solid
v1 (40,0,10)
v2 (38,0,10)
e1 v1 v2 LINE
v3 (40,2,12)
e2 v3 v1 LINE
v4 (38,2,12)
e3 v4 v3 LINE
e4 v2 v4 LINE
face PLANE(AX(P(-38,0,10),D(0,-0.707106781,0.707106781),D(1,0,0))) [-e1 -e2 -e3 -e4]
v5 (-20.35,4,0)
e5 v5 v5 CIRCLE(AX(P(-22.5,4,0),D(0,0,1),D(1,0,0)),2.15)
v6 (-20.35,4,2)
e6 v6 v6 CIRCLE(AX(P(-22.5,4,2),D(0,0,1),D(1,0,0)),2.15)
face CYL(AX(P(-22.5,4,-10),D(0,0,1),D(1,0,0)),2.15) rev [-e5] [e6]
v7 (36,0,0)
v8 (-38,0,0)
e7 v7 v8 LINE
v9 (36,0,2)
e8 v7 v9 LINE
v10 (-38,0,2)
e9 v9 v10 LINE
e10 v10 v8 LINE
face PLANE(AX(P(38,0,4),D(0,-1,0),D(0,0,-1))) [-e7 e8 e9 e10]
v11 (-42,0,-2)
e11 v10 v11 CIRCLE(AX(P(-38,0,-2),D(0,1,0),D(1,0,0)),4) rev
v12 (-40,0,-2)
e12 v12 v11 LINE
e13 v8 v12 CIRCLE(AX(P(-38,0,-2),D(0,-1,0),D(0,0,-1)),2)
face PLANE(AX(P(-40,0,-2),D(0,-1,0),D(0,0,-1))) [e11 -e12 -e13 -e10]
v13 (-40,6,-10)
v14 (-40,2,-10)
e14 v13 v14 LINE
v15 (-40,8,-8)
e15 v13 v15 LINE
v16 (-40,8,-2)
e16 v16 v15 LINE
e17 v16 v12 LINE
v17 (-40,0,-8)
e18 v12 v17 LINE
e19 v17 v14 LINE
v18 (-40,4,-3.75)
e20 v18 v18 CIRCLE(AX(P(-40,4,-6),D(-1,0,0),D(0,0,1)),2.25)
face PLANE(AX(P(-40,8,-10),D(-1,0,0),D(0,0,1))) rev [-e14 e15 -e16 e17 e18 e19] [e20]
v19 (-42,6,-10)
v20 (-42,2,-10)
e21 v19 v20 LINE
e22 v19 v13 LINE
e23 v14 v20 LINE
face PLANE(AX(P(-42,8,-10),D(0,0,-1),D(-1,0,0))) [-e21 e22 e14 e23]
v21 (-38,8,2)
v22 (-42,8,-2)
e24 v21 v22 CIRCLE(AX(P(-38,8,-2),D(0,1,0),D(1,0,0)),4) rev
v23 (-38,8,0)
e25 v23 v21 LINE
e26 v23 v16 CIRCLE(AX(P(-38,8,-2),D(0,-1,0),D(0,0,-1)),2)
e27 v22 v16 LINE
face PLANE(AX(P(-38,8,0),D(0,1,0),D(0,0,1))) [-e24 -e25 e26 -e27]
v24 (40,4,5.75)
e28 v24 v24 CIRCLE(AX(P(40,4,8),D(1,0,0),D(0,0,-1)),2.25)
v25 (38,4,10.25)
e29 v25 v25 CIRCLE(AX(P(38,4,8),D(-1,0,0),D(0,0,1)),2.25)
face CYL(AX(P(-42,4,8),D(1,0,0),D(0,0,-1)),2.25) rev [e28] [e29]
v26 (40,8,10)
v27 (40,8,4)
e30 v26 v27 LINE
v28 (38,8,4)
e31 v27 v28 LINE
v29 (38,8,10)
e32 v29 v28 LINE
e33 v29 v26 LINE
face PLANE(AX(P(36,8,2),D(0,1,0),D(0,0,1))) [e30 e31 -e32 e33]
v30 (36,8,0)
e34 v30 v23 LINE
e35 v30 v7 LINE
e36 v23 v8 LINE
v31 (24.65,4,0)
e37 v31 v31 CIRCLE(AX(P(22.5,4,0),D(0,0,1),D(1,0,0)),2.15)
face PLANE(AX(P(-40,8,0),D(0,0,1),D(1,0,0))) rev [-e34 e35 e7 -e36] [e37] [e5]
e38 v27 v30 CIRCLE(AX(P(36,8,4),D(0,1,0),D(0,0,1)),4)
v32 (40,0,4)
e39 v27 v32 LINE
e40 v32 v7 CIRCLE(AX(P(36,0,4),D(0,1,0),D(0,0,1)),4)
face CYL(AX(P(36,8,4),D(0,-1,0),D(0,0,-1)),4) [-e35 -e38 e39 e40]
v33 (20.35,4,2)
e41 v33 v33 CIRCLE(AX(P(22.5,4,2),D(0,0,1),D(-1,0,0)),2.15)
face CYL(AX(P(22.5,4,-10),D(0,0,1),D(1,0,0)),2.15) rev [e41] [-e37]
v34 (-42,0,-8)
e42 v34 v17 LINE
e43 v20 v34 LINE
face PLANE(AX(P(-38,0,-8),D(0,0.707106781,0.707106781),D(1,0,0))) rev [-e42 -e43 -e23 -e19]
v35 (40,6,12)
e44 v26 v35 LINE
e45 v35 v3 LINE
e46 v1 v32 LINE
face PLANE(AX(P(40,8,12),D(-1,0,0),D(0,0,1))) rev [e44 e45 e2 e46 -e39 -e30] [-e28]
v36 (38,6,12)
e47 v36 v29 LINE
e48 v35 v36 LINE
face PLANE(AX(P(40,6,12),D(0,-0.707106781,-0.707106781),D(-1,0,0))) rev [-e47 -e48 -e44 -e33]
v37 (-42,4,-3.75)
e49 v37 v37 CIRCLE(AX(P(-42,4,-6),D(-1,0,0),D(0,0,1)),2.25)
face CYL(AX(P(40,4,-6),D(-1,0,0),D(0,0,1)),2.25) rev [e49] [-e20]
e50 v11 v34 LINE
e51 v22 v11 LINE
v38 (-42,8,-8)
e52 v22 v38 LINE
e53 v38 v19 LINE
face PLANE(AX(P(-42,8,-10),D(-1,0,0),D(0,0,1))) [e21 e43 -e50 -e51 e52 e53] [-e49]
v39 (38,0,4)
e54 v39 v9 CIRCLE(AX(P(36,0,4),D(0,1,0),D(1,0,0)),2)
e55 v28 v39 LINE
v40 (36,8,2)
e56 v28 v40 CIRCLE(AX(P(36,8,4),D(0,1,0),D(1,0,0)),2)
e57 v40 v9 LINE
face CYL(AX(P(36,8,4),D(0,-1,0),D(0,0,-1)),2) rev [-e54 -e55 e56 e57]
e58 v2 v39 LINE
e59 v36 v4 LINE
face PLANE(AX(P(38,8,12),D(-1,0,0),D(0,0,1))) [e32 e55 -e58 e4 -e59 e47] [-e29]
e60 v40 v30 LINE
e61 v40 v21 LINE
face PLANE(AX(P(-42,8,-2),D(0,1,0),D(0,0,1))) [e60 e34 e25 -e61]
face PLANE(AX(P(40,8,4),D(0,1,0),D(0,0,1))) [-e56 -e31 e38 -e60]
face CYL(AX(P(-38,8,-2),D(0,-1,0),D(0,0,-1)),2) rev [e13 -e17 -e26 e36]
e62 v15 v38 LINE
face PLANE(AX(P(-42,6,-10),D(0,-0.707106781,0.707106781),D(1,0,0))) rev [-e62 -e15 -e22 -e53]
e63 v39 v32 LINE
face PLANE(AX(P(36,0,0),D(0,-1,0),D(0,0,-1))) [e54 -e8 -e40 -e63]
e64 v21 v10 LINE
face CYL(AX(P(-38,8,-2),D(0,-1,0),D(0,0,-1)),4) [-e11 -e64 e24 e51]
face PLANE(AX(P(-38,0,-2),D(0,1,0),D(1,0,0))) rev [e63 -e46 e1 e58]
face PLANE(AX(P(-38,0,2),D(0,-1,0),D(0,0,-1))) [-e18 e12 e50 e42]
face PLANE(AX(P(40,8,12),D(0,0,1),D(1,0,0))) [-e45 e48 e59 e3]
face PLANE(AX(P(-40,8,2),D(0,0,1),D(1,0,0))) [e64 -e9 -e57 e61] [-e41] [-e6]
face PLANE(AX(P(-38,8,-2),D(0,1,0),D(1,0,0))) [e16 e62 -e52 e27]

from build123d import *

# Parameters (mm, degrees)
SM_BASE_FLANGE_1_DEPTH = 8
SKETCH_6_R             = 2.15
CUT_EXTRUDE_1_DEPTH    = 45.407206622
CHAMFER_1_SIZE         = 2
SKETCH_7_R             = 2.25
CUT_EXTRUDE_2_DEPTH    = 84.258633186
SKETCH_8_R             = 2.25
CUT_EXTRUDE_3_DEPTH    = 84.258633186


# Sheet-metal steps are written as plain solids
with BuildPart() as part:
    # Sketch 1 → 基体-法兰1 (new body)
    with BuildSketch(Plane(origin=(0, 0, 0), x_dir=(1, 0, 0), z_dir=(0, 1, 0))):
        with BuildLine():
            Line((-40, 10), (-40, 2))
            ThreePointArc((-40, 2), (-39.414213562, 0.585786438), (-38, 0))
            Line((-38, 0), (36, 0))
            ThreePointArc((36, 0), (38.828427125, -1.171572875), (40, -4))
            Line((40, -4), (40, -12))
            Line((40, -12), (38, -12))
            Line((38, -12), (38, -4))
            ThreePointArc((38, -4), (37.414213562, -2.585786438), (36, -2))
            Line((36, -2), (-38, -2))
            ThreePointArc((-38, -2), (-40.828427125, -0.828427125), (-42, 2))
            Line((-42, 2), (-42, 10))
            Line((-42, 10), (-40, 10))
        make_face()
    extrude(amount=SM_BASE_FLANGE_1_DEPTH)

    # 草图6 → 切除-拉伸1 (cut, through all)
    with BuildSketch(Plane.XY.offset(2)):
        with Locations((-22.5, 4)):
            Circle(SKETCH_6_R)
        with Locations((22.5, 4)):
            Circle(SKETCH_6_R)
    extrude(amount=-CUT_EXTRUDE_1_DEPTH, mode=Mode.SUBTRACT)

    # 倒角1
    chamfer_1_edges = [part.edges().sort_by_distance(p)[0] for p in [
        (39, 0, 12),
        (-41, 0, -10),
        (39, 8, 12),
        (-41, 8, -10),
    ]]
    chamfer(chamfer_1_edges, length=CHAMFER_1_SIZE)

    # 草图7 → 切除-拉伸2 (cut, through all)
    with BuildSketch(Plane.ZY.offset(42)):
        with Locations((-6, 4)):
            Circle(SKETCH_7_R)
    extrude(amount=-CUT_EXTRUDE_2_DEPTH, mode=Mode.SUBTRACT)

    # 草图8 → 切除-拉伸3 (cut, through all)
    with BuildSketch(Plane(origin=(40, 0, 0), x_dir=(0, 0, -1), z_dir=(1, 0, 0))):
        with Locations((-8, 4)):
            Circle(SKETCH_8_R)
    extrude(amount=-CUT_EXTRUDE_3_DEPTH, mode=Mode.SUBTRACT)


solid = part.part
